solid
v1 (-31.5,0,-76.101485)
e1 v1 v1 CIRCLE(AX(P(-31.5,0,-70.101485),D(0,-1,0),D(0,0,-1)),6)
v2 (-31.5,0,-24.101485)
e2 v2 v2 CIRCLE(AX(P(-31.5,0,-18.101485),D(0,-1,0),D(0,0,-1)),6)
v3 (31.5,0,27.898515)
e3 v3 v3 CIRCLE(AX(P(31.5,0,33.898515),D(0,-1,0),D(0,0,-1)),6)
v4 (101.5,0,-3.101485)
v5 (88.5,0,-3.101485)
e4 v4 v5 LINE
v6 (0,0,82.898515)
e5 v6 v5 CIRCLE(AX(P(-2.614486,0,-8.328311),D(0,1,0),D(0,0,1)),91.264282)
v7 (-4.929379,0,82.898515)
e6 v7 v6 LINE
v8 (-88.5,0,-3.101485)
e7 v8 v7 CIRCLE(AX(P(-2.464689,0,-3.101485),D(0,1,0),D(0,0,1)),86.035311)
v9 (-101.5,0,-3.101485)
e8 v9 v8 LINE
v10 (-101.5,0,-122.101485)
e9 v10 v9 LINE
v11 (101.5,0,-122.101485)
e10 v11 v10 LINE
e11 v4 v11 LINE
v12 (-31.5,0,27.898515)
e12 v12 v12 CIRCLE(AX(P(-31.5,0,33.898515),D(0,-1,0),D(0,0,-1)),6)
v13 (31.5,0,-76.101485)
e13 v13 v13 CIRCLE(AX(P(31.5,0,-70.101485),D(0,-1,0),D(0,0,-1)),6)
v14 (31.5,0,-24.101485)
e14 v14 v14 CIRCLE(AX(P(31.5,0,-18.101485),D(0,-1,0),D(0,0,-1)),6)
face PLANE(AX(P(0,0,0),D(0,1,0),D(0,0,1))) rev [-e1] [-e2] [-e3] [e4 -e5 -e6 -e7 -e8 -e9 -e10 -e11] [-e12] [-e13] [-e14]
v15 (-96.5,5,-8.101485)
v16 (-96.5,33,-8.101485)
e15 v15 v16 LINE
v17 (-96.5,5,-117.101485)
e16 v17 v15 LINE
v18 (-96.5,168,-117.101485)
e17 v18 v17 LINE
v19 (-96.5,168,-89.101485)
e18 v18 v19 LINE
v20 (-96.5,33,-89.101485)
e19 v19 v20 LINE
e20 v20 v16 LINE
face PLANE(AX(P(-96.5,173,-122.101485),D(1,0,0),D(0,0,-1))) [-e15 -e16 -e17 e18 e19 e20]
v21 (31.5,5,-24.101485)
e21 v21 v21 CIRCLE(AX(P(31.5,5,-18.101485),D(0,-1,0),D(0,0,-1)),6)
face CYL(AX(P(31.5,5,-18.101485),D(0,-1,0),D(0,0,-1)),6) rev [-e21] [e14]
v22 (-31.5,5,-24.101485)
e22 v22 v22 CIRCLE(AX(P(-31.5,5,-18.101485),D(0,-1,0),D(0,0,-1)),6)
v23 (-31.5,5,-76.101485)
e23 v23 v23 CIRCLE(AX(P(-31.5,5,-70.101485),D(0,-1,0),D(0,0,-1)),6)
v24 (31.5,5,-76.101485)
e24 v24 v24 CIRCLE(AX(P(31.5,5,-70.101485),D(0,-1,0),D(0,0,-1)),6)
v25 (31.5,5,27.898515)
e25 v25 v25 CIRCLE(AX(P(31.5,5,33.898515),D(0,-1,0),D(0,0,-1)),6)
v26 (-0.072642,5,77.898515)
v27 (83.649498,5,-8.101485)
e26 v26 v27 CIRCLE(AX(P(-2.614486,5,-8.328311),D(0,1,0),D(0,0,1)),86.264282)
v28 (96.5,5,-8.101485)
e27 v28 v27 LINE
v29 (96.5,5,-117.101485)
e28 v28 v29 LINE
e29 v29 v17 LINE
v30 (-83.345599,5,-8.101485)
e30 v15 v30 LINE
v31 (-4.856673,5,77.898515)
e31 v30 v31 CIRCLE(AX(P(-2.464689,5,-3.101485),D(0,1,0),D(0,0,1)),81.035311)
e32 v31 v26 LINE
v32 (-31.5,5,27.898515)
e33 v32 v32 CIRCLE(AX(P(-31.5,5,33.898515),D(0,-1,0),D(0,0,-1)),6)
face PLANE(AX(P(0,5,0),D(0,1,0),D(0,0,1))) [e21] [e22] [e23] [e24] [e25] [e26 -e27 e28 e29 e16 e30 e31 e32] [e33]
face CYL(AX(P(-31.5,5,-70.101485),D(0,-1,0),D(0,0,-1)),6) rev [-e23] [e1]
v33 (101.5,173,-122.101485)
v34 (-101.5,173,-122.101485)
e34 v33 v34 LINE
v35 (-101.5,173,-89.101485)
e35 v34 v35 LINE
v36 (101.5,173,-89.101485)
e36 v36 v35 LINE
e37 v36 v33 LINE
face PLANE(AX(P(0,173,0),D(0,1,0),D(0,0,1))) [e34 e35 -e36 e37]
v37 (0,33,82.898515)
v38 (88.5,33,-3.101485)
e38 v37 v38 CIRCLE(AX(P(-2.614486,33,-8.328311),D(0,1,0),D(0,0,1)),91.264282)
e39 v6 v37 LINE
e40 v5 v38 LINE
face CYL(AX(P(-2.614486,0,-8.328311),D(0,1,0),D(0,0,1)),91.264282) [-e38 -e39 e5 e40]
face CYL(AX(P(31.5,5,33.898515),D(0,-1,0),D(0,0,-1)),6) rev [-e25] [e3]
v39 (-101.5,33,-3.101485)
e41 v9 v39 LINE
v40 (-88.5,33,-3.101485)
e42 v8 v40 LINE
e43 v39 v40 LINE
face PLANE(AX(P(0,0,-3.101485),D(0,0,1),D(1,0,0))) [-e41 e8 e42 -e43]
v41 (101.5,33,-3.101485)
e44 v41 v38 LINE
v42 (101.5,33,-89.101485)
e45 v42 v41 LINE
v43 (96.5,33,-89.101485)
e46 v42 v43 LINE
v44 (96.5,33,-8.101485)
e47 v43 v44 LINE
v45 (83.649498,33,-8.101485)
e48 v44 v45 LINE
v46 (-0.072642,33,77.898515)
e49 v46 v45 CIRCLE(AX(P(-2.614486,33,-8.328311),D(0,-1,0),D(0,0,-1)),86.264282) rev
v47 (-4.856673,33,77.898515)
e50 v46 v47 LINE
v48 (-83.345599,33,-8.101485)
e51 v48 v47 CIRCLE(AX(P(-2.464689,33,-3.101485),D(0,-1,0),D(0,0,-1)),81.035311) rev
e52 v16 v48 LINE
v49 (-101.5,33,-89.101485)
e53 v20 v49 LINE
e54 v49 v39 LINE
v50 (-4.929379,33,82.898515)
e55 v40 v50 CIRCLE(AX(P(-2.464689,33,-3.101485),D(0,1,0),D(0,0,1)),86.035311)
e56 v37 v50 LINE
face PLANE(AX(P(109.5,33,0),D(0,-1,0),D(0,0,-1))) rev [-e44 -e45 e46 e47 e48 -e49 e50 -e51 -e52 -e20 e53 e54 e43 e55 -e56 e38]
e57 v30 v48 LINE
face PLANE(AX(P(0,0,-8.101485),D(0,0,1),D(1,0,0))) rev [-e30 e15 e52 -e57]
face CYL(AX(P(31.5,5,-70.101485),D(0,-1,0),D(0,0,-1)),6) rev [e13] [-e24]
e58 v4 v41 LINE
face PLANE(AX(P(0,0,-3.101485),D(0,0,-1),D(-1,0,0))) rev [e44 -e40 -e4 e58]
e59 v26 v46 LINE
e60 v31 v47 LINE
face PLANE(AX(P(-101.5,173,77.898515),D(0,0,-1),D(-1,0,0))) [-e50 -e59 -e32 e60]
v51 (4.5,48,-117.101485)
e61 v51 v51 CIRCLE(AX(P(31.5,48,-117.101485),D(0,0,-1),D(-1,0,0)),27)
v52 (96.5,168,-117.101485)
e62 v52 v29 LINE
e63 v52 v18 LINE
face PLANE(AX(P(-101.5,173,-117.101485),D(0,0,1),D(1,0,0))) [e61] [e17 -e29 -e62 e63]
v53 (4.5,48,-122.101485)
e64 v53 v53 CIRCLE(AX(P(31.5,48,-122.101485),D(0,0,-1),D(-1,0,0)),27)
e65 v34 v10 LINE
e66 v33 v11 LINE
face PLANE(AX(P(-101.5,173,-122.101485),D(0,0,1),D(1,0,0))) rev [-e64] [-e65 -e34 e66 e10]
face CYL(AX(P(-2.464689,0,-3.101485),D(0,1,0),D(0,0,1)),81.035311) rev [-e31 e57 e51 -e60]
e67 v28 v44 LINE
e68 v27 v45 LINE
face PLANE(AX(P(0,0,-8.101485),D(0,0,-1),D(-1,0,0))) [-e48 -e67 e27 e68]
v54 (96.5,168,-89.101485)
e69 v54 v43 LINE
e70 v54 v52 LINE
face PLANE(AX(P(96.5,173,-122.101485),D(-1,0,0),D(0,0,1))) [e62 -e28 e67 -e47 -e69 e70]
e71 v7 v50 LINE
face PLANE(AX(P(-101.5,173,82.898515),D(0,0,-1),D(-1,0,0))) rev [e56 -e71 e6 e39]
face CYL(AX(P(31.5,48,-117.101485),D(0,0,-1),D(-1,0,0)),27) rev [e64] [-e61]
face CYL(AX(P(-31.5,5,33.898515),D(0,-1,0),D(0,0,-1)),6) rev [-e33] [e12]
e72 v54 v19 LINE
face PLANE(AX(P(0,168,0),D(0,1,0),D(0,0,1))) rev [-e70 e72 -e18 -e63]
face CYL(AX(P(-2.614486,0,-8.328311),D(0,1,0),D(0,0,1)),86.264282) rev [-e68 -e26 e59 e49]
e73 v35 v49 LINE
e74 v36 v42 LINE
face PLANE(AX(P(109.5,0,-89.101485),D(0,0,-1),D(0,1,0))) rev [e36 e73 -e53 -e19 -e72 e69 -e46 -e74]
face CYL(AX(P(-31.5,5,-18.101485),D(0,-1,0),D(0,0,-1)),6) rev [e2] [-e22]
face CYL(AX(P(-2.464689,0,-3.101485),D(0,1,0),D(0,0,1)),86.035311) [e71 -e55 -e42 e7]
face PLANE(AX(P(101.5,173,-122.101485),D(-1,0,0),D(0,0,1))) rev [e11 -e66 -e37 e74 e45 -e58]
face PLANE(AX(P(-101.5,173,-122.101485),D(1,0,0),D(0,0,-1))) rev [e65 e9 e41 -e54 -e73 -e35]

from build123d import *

# Parameters (mm, degrees)
CROQUIS1_W              = 203
CROQUIS1_H              = 205
SALIENTE_EXTRUIR1_DEPTH = 173
CROQUIS2_W              = 172
CROQUIS2_H              = 140
CORTAR_EXTRUIR1_DEPTH   = 211
CORTAR_EXTRUIR2_DEPTH   = 33
VACIADO1_START          = 5
VACIADO1_DEPTH          = 163
CROQUIS6_R              = 27
CORTAR_EXTRUIR4_DEPTH   = 5
CROQUIS8_R              = 6
CORTAR_EXTRUIR5_DEPTH   = 5


# Read off the part's stored shape, not the designer's step: Vaciado1
with BuildPart() as part:
    # Croquis1 → Saliente-Extruir1 (new body)
    with BuildSketch(Plane(origin=(0, 0, 0), x_dir=(1, 0, 0), z_dir=(0, 1, 0))):
        with Locations((0, 19.601485149)):
            Rectangle(CROQUIS1_W, CROQUIS1_H)
    extrude(amount=SALIENTE_EXTRUIR1_DEPTH)

    # Croquis2 → Cortar-Extruir1 (cut)
    with BuildSketch(Plane.ZY.offset(101.5)):
        with Locations((-3.101485149, 103)):
            Rectangle(CROQUIS2_W, CROQUIS2_H)
    extrude(amount=-CORTAR_EXTRUIR1_DEPTH, mode=Mode.SUBTRACT)

    # Croquis3 → Cortar-Extruir2 (cut)
    with BuildSketch(Plane(origin=(0, 33, 0), x_dir=(1, 0, 0), z_dir=(0, 1, 0))):
        with BuildLine():
            Line((-101.5, 3.101485149), (-101.5, -82.898514851))
            Line((-101.5, -82.898514851), (-88.5, -82.898514851))
            Line((-88.5, -82.898514851), (-4.929378531, -82.898514851))
            ThreePointArc((-4.929378531, -82.898514851), (-64.166087143, -56.856935388), (-88.5, 3.101485149))
            Line((-88.5, 3.101485149), (-101.5, 3.101485149))
        make_face()
        with BuildLine():
            ThreePointArc((88.5, 3.101485149), (60.988030108, -57.123115602), (0, -82.898514851))
            Line((0, -82.898514851), (88.5, -82.898514851))
            Line((88.5, -82.898514851), (101.5, -82.898514851))
            Line((101.5, -82.898514851), (101.5, 3.101485149))
            Line((101.5, 3.101485149), (88.5, 3.101485149))
        make_face()
    extrude(amount=-CORTAR_EXTRUIR2_DEPTH, mode=Mode.SUBTRACT)

    # Vaciado1 outline → Vaciado1 (cut)
    with BuildSketch(Plane(origin=(0, 0, 0), x_dir=(1, 0, 0), z_dir=(0, 1, 0)).offset(VACIADO1_START)):
        with BuildLine():
            Line((-96.5, 8.101485149), (-83.345599163, 8.101485149))
            ThreePointArc((-83.345599163, 8.101485149), (-62.319461008, -51.525686528), (-4.856672926, -77.898514851))
            Line((-4.856672926, -77.898514851), (-0.072642407, -77.898514851))
            ThreePointArc((-0.072642407, -77.898514851), (59.19666813, -51.84566757), (83.649498309, 8.101485149))
            Line((83.649498309, 8.101485149), (96.5, 8.101485149))
            Line((96.5, 8.101485149), (96.5, 117.101485149))
            Line((96.5, 117.101485149), (-96.5, 117.101485149))
            Line((-96.5, 117.101485149), (-96.5, 8.101485149))
        make_face()
    extrude(amount=VACIADO1_DEPTH, mode=Mode.SUBTRACT)

    # Croquis6 → Cortar-Extruir4 (cut)
    with BuildSketch(Plane(origin=(0, 0, -122.101485149), x_dir=(-1, 0, 0), z_dir=(0, 0, -1))):
        with Locations((-31.5, 48)):
            Circle(CROQUIS6_R)
    extrude(amount=-CORTAR_EXTRUIR4_DEPTH, mode=Mode.SUBTRACT)

    # Croquis8 → Cortar-Extruir5 (cut)
    with BuildSketch(Plane.XZ):
        with Locations(Location((-31.5, -70.101485149, 0), (0, 0, 270))):
            Circle(CROQUIS8_R)
        with Locations(Location((-31.5, -18.101485149, 0), (0, 0, 270))):
            Circle(CROQUIS8_R)
        with Locations(Location((-31.5, 33.898514851, 0), (0, 0, 270))):
            Circle(CROQUIS8_R)
        with Locations(Location((31.5, -18.101485149, 0), (0, 0, 270))):
            Circle(CROQUIS8_R)
        with Locations(Location((31.5, 33.898514851, 0), (0, 0, 270))):
            Circle(CROQUIS8_R)
        with Locations(Location((31.5, -70.101485149, 0), (0, 0, 270))):
            Circle(CROQUIS8_R)
    extrude(amount=-CORTAR_EXTRUIR5_DEPTH, mode=Mode.SUBTRACT)


solid = part.part
